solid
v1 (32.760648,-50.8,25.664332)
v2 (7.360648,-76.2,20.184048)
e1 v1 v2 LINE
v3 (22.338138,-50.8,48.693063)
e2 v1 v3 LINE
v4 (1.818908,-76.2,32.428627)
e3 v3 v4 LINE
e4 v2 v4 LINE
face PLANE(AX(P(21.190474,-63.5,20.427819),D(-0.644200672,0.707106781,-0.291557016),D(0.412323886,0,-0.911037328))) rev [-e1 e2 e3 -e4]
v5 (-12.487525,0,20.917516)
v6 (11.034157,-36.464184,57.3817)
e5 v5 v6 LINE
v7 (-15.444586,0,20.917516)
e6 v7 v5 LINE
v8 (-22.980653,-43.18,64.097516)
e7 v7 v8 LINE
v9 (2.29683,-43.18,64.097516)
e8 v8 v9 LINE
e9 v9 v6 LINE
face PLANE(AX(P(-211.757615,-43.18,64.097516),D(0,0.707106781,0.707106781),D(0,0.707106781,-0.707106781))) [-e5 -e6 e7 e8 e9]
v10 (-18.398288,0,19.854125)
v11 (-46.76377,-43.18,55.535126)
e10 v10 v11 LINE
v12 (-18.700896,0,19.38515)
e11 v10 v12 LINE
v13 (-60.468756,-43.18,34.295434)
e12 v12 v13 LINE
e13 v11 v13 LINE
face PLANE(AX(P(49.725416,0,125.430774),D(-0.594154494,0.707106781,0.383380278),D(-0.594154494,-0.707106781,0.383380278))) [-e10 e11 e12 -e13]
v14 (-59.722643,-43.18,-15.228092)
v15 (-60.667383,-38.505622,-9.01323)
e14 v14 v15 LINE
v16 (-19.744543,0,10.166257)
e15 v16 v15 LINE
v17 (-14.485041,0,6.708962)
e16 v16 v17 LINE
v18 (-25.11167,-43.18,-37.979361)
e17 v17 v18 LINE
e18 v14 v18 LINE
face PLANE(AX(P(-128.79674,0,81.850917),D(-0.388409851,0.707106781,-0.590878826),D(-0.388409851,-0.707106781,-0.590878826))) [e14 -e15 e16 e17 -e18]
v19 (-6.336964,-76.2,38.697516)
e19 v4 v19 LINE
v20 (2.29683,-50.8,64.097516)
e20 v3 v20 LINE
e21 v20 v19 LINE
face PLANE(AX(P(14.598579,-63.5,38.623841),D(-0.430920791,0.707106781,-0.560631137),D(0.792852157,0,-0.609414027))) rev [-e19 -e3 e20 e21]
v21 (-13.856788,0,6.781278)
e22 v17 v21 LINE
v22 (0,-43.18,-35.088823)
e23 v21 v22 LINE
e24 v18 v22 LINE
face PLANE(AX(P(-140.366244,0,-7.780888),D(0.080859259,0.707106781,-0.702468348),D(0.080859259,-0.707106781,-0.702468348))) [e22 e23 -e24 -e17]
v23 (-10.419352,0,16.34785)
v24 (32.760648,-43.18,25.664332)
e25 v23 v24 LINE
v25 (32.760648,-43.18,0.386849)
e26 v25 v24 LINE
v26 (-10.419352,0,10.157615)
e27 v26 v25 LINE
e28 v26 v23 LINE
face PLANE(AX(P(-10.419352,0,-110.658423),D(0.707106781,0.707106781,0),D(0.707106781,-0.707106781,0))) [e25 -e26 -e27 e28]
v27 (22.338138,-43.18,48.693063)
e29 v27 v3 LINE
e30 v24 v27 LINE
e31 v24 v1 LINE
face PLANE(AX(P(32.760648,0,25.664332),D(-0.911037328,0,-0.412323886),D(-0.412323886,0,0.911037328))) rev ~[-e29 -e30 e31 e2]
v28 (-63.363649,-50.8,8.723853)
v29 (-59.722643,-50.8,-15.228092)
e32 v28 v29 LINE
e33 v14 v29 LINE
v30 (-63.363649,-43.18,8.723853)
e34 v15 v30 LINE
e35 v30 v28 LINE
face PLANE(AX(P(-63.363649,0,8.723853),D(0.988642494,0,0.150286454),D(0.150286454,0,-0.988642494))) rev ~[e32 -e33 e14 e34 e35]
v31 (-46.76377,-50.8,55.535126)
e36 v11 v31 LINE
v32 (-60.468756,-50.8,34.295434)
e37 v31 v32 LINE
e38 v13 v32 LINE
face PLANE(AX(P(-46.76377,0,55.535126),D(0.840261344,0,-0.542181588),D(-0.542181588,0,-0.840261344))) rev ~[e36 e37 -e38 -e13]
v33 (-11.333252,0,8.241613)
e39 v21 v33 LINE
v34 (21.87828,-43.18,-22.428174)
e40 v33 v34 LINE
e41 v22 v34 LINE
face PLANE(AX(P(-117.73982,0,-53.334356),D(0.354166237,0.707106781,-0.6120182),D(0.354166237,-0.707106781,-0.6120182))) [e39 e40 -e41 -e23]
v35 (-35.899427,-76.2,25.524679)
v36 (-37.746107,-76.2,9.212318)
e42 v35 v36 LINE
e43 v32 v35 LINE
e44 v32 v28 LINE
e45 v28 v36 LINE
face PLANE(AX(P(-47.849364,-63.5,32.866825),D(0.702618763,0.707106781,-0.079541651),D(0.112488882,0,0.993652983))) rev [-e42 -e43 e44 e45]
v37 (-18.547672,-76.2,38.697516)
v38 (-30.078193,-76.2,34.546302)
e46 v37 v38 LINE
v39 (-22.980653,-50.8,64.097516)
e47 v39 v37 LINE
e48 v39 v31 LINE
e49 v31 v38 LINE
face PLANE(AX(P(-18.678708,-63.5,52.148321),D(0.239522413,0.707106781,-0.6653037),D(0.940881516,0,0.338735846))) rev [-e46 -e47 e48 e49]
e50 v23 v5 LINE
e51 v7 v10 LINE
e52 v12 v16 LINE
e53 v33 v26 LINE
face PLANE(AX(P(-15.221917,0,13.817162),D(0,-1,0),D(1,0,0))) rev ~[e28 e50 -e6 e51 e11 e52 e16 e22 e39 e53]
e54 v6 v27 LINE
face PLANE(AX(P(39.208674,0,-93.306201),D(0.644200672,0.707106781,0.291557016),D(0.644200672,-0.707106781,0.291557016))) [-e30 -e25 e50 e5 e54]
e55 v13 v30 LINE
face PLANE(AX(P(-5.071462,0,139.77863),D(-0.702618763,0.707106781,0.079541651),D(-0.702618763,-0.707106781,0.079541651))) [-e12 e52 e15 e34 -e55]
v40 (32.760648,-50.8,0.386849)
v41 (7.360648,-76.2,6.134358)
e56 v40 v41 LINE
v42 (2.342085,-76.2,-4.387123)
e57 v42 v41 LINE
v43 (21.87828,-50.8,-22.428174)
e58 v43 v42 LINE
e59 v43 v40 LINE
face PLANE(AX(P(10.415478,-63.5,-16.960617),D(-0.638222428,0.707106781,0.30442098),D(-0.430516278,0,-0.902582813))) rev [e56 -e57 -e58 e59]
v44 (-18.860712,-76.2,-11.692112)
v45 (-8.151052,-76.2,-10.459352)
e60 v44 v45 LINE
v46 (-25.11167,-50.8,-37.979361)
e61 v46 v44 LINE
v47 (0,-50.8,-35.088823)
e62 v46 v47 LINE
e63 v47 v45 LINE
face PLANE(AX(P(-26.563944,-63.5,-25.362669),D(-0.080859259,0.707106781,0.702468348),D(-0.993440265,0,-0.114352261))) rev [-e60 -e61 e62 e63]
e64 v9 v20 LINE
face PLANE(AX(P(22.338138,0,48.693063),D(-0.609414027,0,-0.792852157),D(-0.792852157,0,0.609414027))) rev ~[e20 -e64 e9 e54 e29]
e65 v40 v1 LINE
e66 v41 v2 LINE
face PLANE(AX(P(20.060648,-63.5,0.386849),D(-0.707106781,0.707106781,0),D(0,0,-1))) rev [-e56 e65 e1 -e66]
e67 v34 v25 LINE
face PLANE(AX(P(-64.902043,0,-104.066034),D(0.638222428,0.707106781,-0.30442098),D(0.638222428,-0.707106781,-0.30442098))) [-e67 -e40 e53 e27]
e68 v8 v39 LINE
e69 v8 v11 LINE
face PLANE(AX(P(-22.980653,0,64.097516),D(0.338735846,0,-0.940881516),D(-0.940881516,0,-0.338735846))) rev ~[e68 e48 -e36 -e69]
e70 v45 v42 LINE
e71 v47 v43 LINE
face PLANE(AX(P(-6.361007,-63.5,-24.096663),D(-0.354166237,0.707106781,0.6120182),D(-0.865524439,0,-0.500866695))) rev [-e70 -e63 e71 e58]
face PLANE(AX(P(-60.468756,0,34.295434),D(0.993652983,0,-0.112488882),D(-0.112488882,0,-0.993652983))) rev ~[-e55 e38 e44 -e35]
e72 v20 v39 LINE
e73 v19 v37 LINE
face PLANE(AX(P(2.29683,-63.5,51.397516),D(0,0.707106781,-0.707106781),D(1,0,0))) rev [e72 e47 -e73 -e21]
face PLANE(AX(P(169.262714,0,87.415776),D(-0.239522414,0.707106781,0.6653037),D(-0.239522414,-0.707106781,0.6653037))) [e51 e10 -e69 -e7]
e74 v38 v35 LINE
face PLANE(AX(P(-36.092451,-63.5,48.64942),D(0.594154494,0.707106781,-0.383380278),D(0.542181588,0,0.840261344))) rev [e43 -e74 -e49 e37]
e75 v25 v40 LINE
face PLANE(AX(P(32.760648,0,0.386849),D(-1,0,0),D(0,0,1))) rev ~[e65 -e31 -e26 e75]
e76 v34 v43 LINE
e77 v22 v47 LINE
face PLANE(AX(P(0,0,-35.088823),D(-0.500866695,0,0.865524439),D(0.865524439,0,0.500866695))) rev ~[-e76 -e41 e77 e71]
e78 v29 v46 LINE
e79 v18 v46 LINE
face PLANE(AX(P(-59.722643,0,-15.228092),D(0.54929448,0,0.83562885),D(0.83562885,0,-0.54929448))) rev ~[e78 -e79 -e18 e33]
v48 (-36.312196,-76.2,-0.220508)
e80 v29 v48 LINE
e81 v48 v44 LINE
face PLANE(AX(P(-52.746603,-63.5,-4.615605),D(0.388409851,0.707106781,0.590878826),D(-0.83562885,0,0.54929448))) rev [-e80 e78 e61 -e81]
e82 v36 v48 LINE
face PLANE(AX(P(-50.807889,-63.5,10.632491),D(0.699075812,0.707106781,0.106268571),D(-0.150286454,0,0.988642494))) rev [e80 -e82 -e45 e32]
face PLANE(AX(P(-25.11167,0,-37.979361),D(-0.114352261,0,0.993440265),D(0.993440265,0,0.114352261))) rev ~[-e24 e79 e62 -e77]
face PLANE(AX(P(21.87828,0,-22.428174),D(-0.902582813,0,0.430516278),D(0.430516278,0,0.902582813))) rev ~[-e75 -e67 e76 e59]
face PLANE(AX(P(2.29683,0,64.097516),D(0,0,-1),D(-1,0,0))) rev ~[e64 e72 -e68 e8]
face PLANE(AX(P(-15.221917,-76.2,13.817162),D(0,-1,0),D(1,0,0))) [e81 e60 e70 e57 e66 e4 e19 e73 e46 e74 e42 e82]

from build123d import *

# Parameters (mm, degrees)
F1_DEPTH     = 76.2
F2_SIZE      = 25.4
F3_T1_DEPTH  = 325.0997163693
F3_T3_DEPTH  = 325.0997163693
F3_T5_DEPTH  = 247.368026375
F3_T7_DEPTH  = 325.557153853
F3_T9_DEPTH  = 263.50961712
F3_T11_DEPTH = 247.368026375
F3_T13_DEPTH = 247.368026375
F3_T15_DEPTH = 247.368026375
F3_T17_DEPTH = 247.368026375
F3_T19_DEPTH = 247.368026375
F3_T24_DEPTH = 324.0493372034
F3_T29_DEPTH = 324.0493372034
F3_T34_DEPTH = 247.368026375
F3_T39_DEPTH = 247.368026375


# Not quite as in the source:
# - a fillet or chamfer that OpenCascade refuses, or shapes differently, is made with other operations: its cross-section is extruded or revolved along the edge and cut away or added


with BuildPart() as f1:
    # F0 (on Front) → F1 (new body)
    with BuildSketch(Plane.XZ):
        Polygon((-22.9806532577, 64.0975162387), (-46.7637702823, 55.5351264775), (-60.4687564512, 34.2954342025), (-63.3636489511, 8.723853156), (-59.7226433456, -15.2280917391), (-25.1116699455, -37.9793605928), (0, -35.0888232076), (21.8782797456, -22.4281735718), (32.7606478844, 0.3868486179), (32.7606478844, 25.6643321522), (22.3381376327, 48.6930632045), (2.2968302766, 64.0975162387), align=None)
    extrude(amount=F1_DEPTH)

    # F2
    f2_edges = [f1.edges().sort_by_distance(p)[0] for p in [
        (-61.543146, -76.2, -3.252119),
        (-42.417157, -76.2, -26.603726),
        (-12.555835, -76.2, -36.534092),
        (10.93914, -76.2, -28.758498),
        (27.319464, -76.2, -11.020662),
        (32.760648, -76.2, 13.02559),
        (27.549393, -76.2, 37.178698),
        (12.317484, -76.2, 56.39529),
        (-10.341911, -76.2, 64.097516),
        (-34.872212, -76.2, 59.816321),
        (-53.616263, -76.2, 44.91528),
        (-61.916203, -76.2, 21.509644),
    ]]
    chamfer(f2_edges, length=F2_SIZE)

    # F3: chamfer of 43.18 on 12 edges, made by hand

    # F3_s2 → F3_t1 (cut)
    with BuildSketch(Plane.YZ.offset(-211.7576146723)):
        Polygon((-43.18, 64.0975162387), (0, 20.9175162387), (0, 64.0975162387), align=None)
    extrude(amount=F3_T1_DEPTH, mode=Mode.SUBTRACT)

    # F3_s4 → F3_t3 (cut)
    with BuildSketch(Plane(origin=(177.7014842233, 0, 63.9760283522), x_dir=(0, 1, 0), z_dir=(-0.9408815158, 0, -0.3387358457))):
        Polygon((0, -24.9125392558), (-43.18, -68.0925392558), (0, -68.0925392558), align=None)
    extrude(amount=F3_T3_DEPTH, mode=Mode.SUBTRACT)

    # F3_s6 → F3_t5 (cut)
    with BuildSketch(Plane(origin=(71.76035528, 0, 111.212652454), x_dir=(0, 1, 0), z_dir=(-0.5421815882, 0, -0.8402613435))):
        Polygon((0, -26.2239115206), (-43.18, -69.4039115206), (0, -69.4039115206), align=None)
    extrude(amount=F3_T5_DEPTH, mode=Mode.SUBTRACT)

    # F3_s8 → F3_t7 (cut)
    with BuildSketch(Plane(origin=(15.5595712054, 0, 137.4430436178), x_dir=(0, 1, 0), z_dir=(-0.1124888822, 0, -0.9936529834))):
        Polygon((0, -20.7628153082), (-43.18, -63.9428153082), (0, -63.9428153082), align=None)
    extrude(amount=F3_T7_DEPTH, mode=Mode.SUBTRACT)

    # F3_s10 → F3_t9 (cut)
    with BuildSketch(Plane(origin=(-127.5057052722, 0, 83.8149377508), x_dir=(0, 1, 0), z_dir=(0.8356288498, 0, -0.5492944796))):
        Polygon((0, -2.3503510843), (-43.18, -45.5303510843), (0, -45.5303510843), align=None)
    extrude(amount=F3_T9_DEPTH, mode=Mode.SUBTRACT)

    # F3_s12 → F3_t11 (cut)
    with BuildSketch(Plane(origin=(-139.4146792436, 0, -16.0476520785), x_dir=(0, 1, 0), z_dir=(0.9934402652, 0, 0.1143522606))):
        Polygon((0, 8.3213501676), (-43.18, -34.8586498324), (0, -34.8586498324), align=None)
    extrude(amount=F3_T11_DEPTH, mode=Mode.SUBTRACT)

    # F3_s14 → F3_t13 (cut)
    with BuildSketch(Plane(origin=(-111.323834941, 0, -64.4215215589), x_dir=(0, 1, 0), z_dir=(0.8655244386, 0, 0.500866695))):
        Polygon((0, 12.8097659916), (-43.18, -30.3702340084), (0, -30.3702340084), align=None)
    extrude(amount=F3_T13_DEPTH, mode=Mode.SUBTRACT)

    # F3_s16 → F3_t15 (cut)
    with BuildSketch(Plane(origin=(-52.4668465727, 0, -109.9974062184), x_dir=(0, 1, 0), z_dir=(0.4305162784, 0, 0.9025828128))):
        Polygon((0, 13.7773469096), (-43.18, -29.4026530904), (0, -29.4026530904), align=None)
    extrude(amount=F3_T15_DEPTH, mode=Mode.SUBTRACT)

    # F3_s18 → F3_t17 (cut)
    with BuildSketch(Plane.XY.offset(-110.6584228025)):
        Polygon((-10.4193521156, 0), (32.7606478844, -43.18), (32.7606478844, 0), align=None)
    extrude(amount=F3_T17_DEPTH, mode=Mode.SUBTRACT)

    # F3_s20 → F3_t19 (cut)
    with BuildSketch(Plane(origin=(41.7156753309, 0, -92.1715637275), x_dir=(0, 1, 0), z_dir=(-0.4123238865, 0, 0.9110373278))):
        Polygon((0, 2.7518097175), (-43.18, -40.4281902825), (0, -40.4281902825), align=None)
    extrude(amount=F3_T19_DEPTH, mode=Mode.SUBTRACT)


with BuildPart() as f3_tool22:
    # F3_s23 → F3_t24 (new body)
    with BuildSketch(Plane(origin=(-31.0979390453, 0, 204.5742860839), x_dir=(0, 1, 0), z_dir=(0.150286454, 0, -0.9886424944))):
        Polygon((0, -18.1529189981), (-43.18, -61.3329189981), (0, -61.3329189981), align=None)
    extrude(amount=F3_T24_DEPTH)

    split(bisect_by=Plane(origin=(-10.3155166871, 10.3814076541, 1.1677929431), x_dir=(-0.7093543397, -0.7048520559, 0), z_dir=(-0.7026187627, 0.7071067812, 0.0795416514)), keep=Keep.TOP)


with BuildPart() as f1_1:
    add(f1.part)

    # F3_t21: cut F3_tool22
    add(f3_tool22.part, mode=Mode.SUBTRACT)


with BuildPart() as f3_tool27:
    # F3_s28 → F3_t29 (new body)
    with BuildSketch(Plane(origin=(-31.0979390453, 0, 204.5742860839), x_dir=(0, 1, 0), z_dir=(0.150286454, 0, -0.9886424944))):
        Polygon((0, -18.1529189981), (-43.18, -61.3329189981), (0, -61.3329189981), align=None)
    extrude(amount=F3_T29_DEPTH)

    split(bisect_by=Plane(origin=(-0.6455174379, 1.1751755422, -0.9820105866), x_dir=(-0.876476897, -0.481443921, 0), z_dir=(-0.3884098514, 0.7071067812, -0.5908788263)), keep=Keep.TOP)


with BuildPart() as f1_2:
    add(f1_1.part)

    # F3_t26: cut F3_tool27
    add(f3_tool27.part, mode=Mode.SUBTRACT)


with BuildPart() as f3_tool32:
    # F3_s33 → F3_t34 (new body)
    with BuildSketch(Plane(origin=(78.5572793932, 0, -60.3818852432), x_dir=(0, 1, 0), z_dir=(-0.7928521575, 0, 0.609414027))):
        Polygon((-43.18, -52.2195746281), (0, -9.0395746281), (0, -52.2195746281), align=None)
    extrude(amount=F3_T34_DEPTH)

    split(bisect_by=Plane(origin=(-1.2535006858, -1.3759048587, -0.5673184388), x_dir=(-0.7392234901, 0.6734601931, 0), z_dir=(0.6442006724, 0.7071067812, 0.2915570162)), keep=Keep.TOP)


with BuildPart() as f1_3:
    add(f1_2.part)

    # F3_t31: cut F3_tool32
    add(f3_tool32.part, mode=Mode.SUBTRACT)


with BuildPart() as f3_tool37:
    # F3_s38 → F3_t39 (new body)
    with BuildSketch(Plane(origin=(78.5572793932, 0, -60.3818852432), x_dir=(0, 1, 0), z_dir=(-0.7928521575, 0, 0.609414027))):
        Polygon((-43.18, -52.2195746281), (0, -9.0395746281), (0, -52.2195746281), align=None)
    extrude(amount=F3_T39_DEPTH)

    split(bisect_by=Plane(origin=(0, 10.4587581193, 10.4587581193), x_dir=(1, 0, 0), z_dir=(0, 0.7071067812, 0.7071067812)), keep=Keep.TOP)


with BuildPart() as f1_4:
    add(f1_3.part)

    # F3_t36: cut F3_tool37
    add(f3_tool37.part, mode=Mode.SUBTRACT)


solid = f1_4.part
